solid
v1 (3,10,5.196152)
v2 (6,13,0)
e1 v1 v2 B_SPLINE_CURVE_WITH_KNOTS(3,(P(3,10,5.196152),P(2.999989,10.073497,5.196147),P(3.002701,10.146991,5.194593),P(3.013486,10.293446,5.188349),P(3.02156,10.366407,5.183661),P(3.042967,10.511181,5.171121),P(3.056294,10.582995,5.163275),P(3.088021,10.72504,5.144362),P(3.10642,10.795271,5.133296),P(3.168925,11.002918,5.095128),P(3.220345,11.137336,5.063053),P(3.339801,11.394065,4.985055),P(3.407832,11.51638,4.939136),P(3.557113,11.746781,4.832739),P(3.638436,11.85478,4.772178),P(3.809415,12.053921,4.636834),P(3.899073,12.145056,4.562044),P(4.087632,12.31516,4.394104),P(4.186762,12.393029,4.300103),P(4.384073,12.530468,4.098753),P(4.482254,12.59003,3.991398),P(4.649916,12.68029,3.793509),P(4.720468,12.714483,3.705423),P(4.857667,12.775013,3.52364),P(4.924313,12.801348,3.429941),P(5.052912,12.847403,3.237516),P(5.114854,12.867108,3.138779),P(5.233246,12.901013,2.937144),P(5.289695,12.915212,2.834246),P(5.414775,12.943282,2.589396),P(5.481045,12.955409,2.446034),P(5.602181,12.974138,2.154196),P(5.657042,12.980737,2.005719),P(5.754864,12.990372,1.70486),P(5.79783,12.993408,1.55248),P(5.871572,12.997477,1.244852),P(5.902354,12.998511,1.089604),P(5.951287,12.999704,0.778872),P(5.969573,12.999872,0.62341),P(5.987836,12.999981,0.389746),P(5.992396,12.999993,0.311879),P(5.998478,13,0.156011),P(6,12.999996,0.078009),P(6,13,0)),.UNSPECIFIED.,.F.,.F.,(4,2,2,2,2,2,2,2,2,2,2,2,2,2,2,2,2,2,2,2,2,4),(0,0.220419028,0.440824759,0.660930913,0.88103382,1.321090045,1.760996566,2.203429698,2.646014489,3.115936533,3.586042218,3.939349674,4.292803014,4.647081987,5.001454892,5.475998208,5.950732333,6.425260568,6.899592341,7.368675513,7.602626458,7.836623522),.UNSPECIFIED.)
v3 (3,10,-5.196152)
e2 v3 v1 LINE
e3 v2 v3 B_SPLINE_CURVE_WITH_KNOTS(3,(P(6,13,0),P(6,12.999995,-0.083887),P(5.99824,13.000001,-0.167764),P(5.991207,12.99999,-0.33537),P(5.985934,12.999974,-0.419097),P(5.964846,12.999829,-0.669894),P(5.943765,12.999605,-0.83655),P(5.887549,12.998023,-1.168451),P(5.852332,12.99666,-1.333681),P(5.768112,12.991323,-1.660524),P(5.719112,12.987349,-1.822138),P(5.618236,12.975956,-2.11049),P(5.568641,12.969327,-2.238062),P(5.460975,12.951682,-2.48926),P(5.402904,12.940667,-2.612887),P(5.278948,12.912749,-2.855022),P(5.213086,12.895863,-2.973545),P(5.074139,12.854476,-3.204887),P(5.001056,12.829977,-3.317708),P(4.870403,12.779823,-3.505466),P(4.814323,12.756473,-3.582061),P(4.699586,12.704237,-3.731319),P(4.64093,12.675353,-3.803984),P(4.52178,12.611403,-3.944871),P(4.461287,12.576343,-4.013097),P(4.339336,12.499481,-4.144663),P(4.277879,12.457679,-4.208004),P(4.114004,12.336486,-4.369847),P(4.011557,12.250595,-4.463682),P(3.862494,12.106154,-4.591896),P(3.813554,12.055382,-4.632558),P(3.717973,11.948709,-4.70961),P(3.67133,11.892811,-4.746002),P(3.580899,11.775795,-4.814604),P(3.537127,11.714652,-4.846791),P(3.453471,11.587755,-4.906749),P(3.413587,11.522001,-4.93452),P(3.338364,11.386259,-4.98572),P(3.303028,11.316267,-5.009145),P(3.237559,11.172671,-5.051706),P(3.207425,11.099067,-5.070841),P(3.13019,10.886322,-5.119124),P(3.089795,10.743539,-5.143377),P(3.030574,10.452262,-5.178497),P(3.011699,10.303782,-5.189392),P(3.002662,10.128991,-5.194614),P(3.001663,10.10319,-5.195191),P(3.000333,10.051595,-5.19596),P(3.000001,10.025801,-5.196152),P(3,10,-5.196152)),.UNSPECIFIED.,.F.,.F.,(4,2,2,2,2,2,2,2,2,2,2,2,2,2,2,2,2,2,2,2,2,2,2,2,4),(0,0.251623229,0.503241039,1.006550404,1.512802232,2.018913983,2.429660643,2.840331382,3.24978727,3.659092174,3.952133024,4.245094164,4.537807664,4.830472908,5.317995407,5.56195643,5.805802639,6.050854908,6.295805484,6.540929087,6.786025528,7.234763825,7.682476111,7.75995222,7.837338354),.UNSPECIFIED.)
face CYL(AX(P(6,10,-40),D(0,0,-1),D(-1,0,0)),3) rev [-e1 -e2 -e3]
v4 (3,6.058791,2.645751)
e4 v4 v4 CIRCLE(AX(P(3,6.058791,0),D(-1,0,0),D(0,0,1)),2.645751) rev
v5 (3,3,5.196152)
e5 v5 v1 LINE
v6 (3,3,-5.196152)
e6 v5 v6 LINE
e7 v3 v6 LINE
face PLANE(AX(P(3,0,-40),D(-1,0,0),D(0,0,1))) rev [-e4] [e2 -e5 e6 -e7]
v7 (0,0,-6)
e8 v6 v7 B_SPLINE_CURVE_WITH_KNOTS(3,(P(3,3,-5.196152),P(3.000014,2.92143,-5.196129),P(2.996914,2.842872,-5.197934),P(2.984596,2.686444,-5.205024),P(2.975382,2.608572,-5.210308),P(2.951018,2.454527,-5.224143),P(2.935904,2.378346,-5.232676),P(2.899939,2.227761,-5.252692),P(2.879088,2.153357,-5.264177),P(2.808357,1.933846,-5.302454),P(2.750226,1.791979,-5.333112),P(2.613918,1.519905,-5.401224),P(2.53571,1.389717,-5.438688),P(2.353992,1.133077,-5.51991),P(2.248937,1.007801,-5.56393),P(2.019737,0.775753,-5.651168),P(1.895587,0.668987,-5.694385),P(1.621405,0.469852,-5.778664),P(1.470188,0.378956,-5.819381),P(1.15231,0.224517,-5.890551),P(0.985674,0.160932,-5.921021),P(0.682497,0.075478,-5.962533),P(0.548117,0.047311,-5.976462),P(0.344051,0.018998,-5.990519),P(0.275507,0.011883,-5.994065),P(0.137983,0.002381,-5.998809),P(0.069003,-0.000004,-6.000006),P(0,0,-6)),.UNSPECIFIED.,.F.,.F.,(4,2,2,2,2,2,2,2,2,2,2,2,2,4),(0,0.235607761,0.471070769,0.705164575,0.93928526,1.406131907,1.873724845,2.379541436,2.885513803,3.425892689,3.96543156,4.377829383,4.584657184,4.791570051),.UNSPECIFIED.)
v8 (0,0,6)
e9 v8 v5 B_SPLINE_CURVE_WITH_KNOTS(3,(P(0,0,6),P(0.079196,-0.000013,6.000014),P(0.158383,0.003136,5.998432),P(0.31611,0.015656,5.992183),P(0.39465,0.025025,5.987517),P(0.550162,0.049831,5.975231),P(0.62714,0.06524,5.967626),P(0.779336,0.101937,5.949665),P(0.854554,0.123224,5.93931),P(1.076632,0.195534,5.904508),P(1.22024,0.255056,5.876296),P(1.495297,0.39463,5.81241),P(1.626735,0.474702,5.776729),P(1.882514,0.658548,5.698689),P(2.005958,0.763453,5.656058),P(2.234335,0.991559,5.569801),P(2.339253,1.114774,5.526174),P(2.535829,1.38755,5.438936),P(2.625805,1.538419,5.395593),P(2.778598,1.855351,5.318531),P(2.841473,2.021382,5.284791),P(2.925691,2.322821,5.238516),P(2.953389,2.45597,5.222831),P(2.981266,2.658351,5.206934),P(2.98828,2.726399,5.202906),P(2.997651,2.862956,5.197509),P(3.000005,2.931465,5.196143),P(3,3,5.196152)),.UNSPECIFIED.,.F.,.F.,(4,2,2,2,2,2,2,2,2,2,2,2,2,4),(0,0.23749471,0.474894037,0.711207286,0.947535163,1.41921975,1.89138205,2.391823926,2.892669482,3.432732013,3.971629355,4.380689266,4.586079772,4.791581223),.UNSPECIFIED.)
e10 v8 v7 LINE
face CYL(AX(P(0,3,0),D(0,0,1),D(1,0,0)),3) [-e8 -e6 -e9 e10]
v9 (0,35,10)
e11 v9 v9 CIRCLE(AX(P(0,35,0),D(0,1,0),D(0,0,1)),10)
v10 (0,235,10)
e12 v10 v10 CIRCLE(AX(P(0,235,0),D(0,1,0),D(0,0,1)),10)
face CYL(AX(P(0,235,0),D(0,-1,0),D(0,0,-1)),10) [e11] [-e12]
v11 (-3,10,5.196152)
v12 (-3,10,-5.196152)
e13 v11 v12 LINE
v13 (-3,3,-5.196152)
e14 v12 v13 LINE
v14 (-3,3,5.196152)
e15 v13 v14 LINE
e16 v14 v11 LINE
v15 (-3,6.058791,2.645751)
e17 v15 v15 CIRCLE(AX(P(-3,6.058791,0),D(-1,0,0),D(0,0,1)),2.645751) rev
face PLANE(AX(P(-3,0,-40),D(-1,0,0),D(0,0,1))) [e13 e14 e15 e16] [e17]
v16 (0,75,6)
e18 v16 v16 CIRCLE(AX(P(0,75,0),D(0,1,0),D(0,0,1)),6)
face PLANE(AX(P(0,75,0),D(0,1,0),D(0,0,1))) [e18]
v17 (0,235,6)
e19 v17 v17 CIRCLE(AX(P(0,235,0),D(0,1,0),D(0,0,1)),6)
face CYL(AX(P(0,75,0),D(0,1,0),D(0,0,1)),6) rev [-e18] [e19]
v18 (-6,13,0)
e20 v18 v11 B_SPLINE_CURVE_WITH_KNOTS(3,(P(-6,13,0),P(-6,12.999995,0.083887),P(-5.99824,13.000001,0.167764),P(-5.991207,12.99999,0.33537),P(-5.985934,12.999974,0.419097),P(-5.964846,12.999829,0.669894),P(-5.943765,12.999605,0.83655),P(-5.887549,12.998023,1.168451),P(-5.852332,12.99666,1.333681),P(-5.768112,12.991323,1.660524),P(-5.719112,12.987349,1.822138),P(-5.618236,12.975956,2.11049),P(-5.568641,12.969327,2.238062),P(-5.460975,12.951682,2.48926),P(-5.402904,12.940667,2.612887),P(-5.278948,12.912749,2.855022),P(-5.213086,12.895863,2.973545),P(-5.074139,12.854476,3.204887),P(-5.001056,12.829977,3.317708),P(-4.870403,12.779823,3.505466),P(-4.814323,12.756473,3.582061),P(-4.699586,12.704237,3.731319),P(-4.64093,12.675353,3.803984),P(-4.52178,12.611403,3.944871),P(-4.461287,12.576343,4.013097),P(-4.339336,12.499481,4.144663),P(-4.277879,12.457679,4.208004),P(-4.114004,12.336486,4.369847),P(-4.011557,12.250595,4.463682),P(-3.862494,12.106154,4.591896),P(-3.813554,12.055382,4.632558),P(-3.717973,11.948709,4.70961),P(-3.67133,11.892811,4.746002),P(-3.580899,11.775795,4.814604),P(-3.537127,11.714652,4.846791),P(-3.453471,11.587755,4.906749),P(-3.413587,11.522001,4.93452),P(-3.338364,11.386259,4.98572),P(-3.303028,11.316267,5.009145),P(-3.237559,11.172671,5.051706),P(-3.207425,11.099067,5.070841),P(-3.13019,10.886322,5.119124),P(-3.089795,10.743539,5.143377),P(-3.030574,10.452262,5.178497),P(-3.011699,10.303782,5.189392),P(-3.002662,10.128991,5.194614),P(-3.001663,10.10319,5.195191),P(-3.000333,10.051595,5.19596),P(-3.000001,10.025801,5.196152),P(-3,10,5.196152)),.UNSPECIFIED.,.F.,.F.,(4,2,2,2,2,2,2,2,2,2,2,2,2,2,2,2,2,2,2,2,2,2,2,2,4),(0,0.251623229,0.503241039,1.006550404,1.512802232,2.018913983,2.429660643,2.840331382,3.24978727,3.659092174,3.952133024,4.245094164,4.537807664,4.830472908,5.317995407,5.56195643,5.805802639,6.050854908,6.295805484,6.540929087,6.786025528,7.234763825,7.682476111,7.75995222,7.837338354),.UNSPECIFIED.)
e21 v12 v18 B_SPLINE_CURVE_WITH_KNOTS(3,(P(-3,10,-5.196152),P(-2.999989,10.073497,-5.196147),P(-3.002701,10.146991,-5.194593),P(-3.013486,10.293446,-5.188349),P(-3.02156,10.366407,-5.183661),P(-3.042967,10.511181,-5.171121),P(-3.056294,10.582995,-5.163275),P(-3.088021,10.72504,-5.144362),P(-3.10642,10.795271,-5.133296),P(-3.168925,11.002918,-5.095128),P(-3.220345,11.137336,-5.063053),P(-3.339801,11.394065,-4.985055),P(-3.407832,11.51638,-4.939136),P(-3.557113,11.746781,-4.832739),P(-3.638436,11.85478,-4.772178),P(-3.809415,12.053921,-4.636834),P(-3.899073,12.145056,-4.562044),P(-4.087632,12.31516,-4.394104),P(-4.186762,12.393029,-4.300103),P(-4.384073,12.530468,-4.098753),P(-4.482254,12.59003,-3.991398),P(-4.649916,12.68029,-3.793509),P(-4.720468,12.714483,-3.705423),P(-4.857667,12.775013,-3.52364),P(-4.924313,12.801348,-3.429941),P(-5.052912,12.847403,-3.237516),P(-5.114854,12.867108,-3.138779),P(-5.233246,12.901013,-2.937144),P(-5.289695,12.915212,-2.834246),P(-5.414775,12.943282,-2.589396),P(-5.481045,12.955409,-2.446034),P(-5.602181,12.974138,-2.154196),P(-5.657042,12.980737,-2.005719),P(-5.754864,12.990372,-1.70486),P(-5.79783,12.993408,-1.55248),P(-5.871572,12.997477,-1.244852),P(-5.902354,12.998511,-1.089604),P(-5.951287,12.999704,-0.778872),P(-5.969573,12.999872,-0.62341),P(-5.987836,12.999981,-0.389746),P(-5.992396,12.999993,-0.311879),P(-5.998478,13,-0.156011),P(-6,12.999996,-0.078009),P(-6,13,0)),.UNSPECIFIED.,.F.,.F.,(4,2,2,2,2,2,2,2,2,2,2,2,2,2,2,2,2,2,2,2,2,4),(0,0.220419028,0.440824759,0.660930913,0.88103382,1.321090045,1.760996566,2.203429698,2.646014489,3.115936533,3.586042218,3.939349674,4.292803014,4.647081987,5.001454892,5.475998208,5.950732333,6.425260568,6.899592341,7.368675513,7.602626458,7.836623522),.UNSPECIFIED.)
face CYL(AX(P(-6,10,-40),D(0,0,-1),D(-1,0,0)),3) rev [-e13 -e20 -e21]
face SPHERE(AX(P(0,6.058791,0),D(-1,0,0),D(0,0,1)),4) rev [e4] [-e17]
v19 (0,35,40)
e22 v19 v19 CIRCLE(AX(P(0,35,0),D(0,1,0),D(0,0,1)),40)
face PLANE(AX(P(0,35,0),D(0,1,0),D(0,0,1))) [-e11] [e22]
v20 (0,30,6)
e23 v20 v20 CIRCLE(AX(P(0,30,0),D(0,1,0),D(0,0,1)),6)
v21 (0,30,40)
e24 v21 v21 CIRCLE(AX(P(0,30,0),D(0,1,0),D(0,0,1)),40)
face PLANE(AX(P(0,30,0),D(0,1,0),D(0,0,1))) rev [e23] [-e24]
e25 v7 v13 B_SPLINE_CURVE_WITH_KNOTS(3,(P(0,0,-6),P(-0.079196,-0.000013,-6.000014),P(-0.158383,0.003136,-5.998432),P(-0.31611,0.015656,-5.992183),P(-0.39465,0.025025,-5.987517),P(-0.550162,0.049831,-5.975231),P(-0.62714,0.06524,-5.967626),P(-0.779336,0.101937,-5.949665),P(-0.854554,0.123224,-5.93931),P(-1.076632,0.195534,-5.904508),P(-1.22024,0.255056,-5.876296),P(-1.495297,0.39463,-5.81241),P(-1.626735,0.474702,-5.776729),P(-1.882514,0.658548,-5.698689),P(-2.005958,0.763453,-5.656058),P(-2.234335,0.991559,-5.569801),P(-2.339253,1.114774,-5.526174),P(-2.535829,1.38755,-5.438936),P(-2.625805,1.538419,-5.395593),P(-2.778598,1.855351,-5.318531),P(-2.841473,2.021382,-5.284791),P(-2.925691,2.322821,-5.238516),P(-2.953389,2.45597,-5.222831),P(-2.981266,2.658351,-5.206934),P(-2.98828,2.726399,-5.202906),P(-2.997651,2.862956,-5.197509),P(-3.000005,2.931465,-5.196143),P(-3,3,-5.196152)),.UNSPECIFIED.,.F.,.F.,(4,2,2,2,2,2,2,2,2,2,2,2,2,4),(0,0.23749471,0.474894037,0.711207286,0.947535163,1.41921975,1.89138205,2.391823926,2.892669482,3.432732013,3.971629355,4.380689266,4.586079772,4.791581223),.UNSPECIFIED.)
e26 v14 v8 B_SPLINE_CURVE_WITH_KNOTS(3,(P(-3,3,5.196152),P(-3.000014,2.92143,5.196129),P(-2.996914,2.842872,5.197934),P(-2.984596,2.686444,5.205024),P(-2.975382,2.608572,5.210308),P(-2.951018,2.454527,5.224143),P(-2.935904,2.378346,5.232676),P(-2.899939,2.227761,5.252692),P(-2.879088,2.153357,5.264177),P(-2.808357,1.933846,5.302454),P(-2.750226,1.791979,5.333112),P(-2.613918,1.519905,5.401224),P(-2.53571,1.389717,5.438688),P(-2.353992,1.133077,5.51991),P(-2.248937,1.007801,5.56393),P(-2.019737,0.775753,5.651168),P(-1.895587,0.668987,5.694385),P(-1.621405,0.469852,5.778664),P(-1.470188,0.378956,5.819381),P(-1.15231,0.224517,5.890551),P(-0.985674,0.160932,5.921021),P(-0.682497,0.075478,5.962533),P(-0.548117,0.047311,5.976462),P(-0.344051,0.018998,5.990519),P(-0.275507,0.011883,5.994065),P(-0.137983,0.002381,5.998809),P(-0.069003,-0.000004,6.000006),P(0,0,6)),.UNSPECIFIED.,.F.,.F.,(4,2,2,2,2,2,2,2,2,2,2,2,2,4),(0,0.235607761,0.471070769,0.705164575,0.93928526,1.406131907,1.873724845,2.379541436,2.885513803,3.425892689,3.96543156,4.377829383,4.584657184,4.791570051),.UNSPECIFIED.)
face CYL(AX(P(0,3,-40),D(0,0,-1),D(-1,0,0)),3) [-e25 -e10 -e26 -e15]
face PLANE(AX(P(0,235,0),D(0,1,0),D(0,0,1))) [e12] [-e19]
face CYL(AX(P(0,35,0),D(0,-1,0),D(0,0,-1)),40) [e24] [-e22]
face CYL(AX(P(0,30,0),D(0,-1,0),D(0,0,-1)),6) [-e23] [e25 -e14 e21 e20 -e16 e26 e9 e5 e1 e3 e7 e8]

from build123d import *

# Parameters (mm, degrees)
SCHIZZO1_R                   = 6
ESTRUSIONE_ESTRUSIONE1_DEPTH = 30
SCHIZZO2_R                   = 40
ESTRUSIONE_ESTRUSIONE2_DEPTH = 5
SCHIZZO3_R                   = 10
ESTRUSIONE_ESTRUSIONE3_DEPTH = 200
TAGLIO_ESTRUSIONE1_START     = -160
SCHIZZO4_R                   = 6
TAGLIO_ESTRUSIONE1_DEPTH     = 160
SCHIZZO5_W                   = 3
SCHIZZO5_H                   = 13
TAGLIO_ESTRUSIONE2_DEPTH     = 242.712639305
RACCORDO1_R                  = 3


with BuildPart() as part:
    # Schizzo1 → Estrusione-Estrusione1 (new body)
    with BuildSketch(Plane(origin=(0, 0, 0), x_dir=(1, 0, 0), z_dir=(0, 1, 0))):
        with Locations(Location((0, 0, 0), (0, 0, 270))):
            Circle(SCHIZZO1_R)
    extrude(amount=ESTRUSIONE_ESTRUSIONE1_DEPTH)

    # Schizzo2 → Estrusione-Estrusione2 (add)
    with BuildSketch(Plane(origin=(0, 30, 0), x_dir=(1, 0, 0), z_dir=(0, 1, 0))):
        with Locations(Location((0, 0, 0), (0, 0, 270))):
            Circle(SCHIZZO2_R)
    extrude(amount=ESTRUSIONE_ESTRUSIONE2_DEPTH)

    # Schizzo3 → Estrusione-Estrusione3 (add)
    with BuildSketch(Plane(origin=(0, 35, 0), x_dir=(1, 0, 0), z_dir=(0, 1, 0))):
        with Locations(Location((0, 0, 0), (0, 0, 270))):
            Circle(SCHIZZO3_R)
    extrude(amount=ESTRUSIONE_ESTRUSIONE3_DEPTH)

    # Schizzo4 → Taglio-Estrusione1 (cut)
    with BuildSketch(Plane(origin=(0, 235, 0), x_dir=(1, 0, 0), z_dir=(0, 1, 0)).offset(TAGLIO_ESTRUSIONE1_START)):
        with Locations(Location((0, 0, 0), (0, 0, 270))):
            Circle(SCHIZZO4_R)
    extrude(amount=TAGLIO_ESTRUSIONE1_DEPTH, mode=Mode.SUBTRACT)

    # Schizzo5 → Taglio-Estrusione2 (cut, symmetric)
    with BuildSketch(Plane.XY):
        with Locations((4.5, 6.5)):
            Rectangle(SCHIZZO5_W, SCHIZZO5_H)
    taglio_estrusione2 = extrude(amount=TAGLIO_ESTRUSIONE2_DEPTH, both=True, mode=Mode.SUBTRACT)

    # Specchia1: Taglio-Estrusione2 across plane
    add(taglio_estrusione2.mirror(Plane(origin=(0, 0, 0), x_dir=(0, 0, 1), z_dir=(1, 0, 0))), mode=Mode.SUBTRACT)


with BuildPart() as body_2:
    # Schizzo6 → Rivoluzione1 (revolve)
    with BuildSketch(Plane(origin=(0, 0, 0), x_dir=(0, 0, -1), z_dir=(1, 0, 0))):
        with BuildLine():
            Line((-4, 6.058790505), (4, 6.058790505))
            ThreePointArc((4, 6.058790505), (0, 10.058790505), (-4, 6.058790505))
        make_face()
    revolve(axis=Axis((0, 6.058790505, 4), (0, 0, -1)))


with BuildPart() as part_1:
    add(part.part)

    # Abbina1: cut body 2
    add(body_2.part, mode=Mode.SUBTRACT)

    # Raccordo1
    raccordo1_edges = [part_1.edges().sort_by_distance(p)[0] for p in [
        (3, 0, 0),
        (-3, 0, 0),
        (-3, 13, 0),
        (3, 13, 0),
    ]]
    fillet(raccordo1_edges, radius=RACCORDO1_R - 0.0001)  # a hair under: the kernel refuses the full size


solid = part_1.part
